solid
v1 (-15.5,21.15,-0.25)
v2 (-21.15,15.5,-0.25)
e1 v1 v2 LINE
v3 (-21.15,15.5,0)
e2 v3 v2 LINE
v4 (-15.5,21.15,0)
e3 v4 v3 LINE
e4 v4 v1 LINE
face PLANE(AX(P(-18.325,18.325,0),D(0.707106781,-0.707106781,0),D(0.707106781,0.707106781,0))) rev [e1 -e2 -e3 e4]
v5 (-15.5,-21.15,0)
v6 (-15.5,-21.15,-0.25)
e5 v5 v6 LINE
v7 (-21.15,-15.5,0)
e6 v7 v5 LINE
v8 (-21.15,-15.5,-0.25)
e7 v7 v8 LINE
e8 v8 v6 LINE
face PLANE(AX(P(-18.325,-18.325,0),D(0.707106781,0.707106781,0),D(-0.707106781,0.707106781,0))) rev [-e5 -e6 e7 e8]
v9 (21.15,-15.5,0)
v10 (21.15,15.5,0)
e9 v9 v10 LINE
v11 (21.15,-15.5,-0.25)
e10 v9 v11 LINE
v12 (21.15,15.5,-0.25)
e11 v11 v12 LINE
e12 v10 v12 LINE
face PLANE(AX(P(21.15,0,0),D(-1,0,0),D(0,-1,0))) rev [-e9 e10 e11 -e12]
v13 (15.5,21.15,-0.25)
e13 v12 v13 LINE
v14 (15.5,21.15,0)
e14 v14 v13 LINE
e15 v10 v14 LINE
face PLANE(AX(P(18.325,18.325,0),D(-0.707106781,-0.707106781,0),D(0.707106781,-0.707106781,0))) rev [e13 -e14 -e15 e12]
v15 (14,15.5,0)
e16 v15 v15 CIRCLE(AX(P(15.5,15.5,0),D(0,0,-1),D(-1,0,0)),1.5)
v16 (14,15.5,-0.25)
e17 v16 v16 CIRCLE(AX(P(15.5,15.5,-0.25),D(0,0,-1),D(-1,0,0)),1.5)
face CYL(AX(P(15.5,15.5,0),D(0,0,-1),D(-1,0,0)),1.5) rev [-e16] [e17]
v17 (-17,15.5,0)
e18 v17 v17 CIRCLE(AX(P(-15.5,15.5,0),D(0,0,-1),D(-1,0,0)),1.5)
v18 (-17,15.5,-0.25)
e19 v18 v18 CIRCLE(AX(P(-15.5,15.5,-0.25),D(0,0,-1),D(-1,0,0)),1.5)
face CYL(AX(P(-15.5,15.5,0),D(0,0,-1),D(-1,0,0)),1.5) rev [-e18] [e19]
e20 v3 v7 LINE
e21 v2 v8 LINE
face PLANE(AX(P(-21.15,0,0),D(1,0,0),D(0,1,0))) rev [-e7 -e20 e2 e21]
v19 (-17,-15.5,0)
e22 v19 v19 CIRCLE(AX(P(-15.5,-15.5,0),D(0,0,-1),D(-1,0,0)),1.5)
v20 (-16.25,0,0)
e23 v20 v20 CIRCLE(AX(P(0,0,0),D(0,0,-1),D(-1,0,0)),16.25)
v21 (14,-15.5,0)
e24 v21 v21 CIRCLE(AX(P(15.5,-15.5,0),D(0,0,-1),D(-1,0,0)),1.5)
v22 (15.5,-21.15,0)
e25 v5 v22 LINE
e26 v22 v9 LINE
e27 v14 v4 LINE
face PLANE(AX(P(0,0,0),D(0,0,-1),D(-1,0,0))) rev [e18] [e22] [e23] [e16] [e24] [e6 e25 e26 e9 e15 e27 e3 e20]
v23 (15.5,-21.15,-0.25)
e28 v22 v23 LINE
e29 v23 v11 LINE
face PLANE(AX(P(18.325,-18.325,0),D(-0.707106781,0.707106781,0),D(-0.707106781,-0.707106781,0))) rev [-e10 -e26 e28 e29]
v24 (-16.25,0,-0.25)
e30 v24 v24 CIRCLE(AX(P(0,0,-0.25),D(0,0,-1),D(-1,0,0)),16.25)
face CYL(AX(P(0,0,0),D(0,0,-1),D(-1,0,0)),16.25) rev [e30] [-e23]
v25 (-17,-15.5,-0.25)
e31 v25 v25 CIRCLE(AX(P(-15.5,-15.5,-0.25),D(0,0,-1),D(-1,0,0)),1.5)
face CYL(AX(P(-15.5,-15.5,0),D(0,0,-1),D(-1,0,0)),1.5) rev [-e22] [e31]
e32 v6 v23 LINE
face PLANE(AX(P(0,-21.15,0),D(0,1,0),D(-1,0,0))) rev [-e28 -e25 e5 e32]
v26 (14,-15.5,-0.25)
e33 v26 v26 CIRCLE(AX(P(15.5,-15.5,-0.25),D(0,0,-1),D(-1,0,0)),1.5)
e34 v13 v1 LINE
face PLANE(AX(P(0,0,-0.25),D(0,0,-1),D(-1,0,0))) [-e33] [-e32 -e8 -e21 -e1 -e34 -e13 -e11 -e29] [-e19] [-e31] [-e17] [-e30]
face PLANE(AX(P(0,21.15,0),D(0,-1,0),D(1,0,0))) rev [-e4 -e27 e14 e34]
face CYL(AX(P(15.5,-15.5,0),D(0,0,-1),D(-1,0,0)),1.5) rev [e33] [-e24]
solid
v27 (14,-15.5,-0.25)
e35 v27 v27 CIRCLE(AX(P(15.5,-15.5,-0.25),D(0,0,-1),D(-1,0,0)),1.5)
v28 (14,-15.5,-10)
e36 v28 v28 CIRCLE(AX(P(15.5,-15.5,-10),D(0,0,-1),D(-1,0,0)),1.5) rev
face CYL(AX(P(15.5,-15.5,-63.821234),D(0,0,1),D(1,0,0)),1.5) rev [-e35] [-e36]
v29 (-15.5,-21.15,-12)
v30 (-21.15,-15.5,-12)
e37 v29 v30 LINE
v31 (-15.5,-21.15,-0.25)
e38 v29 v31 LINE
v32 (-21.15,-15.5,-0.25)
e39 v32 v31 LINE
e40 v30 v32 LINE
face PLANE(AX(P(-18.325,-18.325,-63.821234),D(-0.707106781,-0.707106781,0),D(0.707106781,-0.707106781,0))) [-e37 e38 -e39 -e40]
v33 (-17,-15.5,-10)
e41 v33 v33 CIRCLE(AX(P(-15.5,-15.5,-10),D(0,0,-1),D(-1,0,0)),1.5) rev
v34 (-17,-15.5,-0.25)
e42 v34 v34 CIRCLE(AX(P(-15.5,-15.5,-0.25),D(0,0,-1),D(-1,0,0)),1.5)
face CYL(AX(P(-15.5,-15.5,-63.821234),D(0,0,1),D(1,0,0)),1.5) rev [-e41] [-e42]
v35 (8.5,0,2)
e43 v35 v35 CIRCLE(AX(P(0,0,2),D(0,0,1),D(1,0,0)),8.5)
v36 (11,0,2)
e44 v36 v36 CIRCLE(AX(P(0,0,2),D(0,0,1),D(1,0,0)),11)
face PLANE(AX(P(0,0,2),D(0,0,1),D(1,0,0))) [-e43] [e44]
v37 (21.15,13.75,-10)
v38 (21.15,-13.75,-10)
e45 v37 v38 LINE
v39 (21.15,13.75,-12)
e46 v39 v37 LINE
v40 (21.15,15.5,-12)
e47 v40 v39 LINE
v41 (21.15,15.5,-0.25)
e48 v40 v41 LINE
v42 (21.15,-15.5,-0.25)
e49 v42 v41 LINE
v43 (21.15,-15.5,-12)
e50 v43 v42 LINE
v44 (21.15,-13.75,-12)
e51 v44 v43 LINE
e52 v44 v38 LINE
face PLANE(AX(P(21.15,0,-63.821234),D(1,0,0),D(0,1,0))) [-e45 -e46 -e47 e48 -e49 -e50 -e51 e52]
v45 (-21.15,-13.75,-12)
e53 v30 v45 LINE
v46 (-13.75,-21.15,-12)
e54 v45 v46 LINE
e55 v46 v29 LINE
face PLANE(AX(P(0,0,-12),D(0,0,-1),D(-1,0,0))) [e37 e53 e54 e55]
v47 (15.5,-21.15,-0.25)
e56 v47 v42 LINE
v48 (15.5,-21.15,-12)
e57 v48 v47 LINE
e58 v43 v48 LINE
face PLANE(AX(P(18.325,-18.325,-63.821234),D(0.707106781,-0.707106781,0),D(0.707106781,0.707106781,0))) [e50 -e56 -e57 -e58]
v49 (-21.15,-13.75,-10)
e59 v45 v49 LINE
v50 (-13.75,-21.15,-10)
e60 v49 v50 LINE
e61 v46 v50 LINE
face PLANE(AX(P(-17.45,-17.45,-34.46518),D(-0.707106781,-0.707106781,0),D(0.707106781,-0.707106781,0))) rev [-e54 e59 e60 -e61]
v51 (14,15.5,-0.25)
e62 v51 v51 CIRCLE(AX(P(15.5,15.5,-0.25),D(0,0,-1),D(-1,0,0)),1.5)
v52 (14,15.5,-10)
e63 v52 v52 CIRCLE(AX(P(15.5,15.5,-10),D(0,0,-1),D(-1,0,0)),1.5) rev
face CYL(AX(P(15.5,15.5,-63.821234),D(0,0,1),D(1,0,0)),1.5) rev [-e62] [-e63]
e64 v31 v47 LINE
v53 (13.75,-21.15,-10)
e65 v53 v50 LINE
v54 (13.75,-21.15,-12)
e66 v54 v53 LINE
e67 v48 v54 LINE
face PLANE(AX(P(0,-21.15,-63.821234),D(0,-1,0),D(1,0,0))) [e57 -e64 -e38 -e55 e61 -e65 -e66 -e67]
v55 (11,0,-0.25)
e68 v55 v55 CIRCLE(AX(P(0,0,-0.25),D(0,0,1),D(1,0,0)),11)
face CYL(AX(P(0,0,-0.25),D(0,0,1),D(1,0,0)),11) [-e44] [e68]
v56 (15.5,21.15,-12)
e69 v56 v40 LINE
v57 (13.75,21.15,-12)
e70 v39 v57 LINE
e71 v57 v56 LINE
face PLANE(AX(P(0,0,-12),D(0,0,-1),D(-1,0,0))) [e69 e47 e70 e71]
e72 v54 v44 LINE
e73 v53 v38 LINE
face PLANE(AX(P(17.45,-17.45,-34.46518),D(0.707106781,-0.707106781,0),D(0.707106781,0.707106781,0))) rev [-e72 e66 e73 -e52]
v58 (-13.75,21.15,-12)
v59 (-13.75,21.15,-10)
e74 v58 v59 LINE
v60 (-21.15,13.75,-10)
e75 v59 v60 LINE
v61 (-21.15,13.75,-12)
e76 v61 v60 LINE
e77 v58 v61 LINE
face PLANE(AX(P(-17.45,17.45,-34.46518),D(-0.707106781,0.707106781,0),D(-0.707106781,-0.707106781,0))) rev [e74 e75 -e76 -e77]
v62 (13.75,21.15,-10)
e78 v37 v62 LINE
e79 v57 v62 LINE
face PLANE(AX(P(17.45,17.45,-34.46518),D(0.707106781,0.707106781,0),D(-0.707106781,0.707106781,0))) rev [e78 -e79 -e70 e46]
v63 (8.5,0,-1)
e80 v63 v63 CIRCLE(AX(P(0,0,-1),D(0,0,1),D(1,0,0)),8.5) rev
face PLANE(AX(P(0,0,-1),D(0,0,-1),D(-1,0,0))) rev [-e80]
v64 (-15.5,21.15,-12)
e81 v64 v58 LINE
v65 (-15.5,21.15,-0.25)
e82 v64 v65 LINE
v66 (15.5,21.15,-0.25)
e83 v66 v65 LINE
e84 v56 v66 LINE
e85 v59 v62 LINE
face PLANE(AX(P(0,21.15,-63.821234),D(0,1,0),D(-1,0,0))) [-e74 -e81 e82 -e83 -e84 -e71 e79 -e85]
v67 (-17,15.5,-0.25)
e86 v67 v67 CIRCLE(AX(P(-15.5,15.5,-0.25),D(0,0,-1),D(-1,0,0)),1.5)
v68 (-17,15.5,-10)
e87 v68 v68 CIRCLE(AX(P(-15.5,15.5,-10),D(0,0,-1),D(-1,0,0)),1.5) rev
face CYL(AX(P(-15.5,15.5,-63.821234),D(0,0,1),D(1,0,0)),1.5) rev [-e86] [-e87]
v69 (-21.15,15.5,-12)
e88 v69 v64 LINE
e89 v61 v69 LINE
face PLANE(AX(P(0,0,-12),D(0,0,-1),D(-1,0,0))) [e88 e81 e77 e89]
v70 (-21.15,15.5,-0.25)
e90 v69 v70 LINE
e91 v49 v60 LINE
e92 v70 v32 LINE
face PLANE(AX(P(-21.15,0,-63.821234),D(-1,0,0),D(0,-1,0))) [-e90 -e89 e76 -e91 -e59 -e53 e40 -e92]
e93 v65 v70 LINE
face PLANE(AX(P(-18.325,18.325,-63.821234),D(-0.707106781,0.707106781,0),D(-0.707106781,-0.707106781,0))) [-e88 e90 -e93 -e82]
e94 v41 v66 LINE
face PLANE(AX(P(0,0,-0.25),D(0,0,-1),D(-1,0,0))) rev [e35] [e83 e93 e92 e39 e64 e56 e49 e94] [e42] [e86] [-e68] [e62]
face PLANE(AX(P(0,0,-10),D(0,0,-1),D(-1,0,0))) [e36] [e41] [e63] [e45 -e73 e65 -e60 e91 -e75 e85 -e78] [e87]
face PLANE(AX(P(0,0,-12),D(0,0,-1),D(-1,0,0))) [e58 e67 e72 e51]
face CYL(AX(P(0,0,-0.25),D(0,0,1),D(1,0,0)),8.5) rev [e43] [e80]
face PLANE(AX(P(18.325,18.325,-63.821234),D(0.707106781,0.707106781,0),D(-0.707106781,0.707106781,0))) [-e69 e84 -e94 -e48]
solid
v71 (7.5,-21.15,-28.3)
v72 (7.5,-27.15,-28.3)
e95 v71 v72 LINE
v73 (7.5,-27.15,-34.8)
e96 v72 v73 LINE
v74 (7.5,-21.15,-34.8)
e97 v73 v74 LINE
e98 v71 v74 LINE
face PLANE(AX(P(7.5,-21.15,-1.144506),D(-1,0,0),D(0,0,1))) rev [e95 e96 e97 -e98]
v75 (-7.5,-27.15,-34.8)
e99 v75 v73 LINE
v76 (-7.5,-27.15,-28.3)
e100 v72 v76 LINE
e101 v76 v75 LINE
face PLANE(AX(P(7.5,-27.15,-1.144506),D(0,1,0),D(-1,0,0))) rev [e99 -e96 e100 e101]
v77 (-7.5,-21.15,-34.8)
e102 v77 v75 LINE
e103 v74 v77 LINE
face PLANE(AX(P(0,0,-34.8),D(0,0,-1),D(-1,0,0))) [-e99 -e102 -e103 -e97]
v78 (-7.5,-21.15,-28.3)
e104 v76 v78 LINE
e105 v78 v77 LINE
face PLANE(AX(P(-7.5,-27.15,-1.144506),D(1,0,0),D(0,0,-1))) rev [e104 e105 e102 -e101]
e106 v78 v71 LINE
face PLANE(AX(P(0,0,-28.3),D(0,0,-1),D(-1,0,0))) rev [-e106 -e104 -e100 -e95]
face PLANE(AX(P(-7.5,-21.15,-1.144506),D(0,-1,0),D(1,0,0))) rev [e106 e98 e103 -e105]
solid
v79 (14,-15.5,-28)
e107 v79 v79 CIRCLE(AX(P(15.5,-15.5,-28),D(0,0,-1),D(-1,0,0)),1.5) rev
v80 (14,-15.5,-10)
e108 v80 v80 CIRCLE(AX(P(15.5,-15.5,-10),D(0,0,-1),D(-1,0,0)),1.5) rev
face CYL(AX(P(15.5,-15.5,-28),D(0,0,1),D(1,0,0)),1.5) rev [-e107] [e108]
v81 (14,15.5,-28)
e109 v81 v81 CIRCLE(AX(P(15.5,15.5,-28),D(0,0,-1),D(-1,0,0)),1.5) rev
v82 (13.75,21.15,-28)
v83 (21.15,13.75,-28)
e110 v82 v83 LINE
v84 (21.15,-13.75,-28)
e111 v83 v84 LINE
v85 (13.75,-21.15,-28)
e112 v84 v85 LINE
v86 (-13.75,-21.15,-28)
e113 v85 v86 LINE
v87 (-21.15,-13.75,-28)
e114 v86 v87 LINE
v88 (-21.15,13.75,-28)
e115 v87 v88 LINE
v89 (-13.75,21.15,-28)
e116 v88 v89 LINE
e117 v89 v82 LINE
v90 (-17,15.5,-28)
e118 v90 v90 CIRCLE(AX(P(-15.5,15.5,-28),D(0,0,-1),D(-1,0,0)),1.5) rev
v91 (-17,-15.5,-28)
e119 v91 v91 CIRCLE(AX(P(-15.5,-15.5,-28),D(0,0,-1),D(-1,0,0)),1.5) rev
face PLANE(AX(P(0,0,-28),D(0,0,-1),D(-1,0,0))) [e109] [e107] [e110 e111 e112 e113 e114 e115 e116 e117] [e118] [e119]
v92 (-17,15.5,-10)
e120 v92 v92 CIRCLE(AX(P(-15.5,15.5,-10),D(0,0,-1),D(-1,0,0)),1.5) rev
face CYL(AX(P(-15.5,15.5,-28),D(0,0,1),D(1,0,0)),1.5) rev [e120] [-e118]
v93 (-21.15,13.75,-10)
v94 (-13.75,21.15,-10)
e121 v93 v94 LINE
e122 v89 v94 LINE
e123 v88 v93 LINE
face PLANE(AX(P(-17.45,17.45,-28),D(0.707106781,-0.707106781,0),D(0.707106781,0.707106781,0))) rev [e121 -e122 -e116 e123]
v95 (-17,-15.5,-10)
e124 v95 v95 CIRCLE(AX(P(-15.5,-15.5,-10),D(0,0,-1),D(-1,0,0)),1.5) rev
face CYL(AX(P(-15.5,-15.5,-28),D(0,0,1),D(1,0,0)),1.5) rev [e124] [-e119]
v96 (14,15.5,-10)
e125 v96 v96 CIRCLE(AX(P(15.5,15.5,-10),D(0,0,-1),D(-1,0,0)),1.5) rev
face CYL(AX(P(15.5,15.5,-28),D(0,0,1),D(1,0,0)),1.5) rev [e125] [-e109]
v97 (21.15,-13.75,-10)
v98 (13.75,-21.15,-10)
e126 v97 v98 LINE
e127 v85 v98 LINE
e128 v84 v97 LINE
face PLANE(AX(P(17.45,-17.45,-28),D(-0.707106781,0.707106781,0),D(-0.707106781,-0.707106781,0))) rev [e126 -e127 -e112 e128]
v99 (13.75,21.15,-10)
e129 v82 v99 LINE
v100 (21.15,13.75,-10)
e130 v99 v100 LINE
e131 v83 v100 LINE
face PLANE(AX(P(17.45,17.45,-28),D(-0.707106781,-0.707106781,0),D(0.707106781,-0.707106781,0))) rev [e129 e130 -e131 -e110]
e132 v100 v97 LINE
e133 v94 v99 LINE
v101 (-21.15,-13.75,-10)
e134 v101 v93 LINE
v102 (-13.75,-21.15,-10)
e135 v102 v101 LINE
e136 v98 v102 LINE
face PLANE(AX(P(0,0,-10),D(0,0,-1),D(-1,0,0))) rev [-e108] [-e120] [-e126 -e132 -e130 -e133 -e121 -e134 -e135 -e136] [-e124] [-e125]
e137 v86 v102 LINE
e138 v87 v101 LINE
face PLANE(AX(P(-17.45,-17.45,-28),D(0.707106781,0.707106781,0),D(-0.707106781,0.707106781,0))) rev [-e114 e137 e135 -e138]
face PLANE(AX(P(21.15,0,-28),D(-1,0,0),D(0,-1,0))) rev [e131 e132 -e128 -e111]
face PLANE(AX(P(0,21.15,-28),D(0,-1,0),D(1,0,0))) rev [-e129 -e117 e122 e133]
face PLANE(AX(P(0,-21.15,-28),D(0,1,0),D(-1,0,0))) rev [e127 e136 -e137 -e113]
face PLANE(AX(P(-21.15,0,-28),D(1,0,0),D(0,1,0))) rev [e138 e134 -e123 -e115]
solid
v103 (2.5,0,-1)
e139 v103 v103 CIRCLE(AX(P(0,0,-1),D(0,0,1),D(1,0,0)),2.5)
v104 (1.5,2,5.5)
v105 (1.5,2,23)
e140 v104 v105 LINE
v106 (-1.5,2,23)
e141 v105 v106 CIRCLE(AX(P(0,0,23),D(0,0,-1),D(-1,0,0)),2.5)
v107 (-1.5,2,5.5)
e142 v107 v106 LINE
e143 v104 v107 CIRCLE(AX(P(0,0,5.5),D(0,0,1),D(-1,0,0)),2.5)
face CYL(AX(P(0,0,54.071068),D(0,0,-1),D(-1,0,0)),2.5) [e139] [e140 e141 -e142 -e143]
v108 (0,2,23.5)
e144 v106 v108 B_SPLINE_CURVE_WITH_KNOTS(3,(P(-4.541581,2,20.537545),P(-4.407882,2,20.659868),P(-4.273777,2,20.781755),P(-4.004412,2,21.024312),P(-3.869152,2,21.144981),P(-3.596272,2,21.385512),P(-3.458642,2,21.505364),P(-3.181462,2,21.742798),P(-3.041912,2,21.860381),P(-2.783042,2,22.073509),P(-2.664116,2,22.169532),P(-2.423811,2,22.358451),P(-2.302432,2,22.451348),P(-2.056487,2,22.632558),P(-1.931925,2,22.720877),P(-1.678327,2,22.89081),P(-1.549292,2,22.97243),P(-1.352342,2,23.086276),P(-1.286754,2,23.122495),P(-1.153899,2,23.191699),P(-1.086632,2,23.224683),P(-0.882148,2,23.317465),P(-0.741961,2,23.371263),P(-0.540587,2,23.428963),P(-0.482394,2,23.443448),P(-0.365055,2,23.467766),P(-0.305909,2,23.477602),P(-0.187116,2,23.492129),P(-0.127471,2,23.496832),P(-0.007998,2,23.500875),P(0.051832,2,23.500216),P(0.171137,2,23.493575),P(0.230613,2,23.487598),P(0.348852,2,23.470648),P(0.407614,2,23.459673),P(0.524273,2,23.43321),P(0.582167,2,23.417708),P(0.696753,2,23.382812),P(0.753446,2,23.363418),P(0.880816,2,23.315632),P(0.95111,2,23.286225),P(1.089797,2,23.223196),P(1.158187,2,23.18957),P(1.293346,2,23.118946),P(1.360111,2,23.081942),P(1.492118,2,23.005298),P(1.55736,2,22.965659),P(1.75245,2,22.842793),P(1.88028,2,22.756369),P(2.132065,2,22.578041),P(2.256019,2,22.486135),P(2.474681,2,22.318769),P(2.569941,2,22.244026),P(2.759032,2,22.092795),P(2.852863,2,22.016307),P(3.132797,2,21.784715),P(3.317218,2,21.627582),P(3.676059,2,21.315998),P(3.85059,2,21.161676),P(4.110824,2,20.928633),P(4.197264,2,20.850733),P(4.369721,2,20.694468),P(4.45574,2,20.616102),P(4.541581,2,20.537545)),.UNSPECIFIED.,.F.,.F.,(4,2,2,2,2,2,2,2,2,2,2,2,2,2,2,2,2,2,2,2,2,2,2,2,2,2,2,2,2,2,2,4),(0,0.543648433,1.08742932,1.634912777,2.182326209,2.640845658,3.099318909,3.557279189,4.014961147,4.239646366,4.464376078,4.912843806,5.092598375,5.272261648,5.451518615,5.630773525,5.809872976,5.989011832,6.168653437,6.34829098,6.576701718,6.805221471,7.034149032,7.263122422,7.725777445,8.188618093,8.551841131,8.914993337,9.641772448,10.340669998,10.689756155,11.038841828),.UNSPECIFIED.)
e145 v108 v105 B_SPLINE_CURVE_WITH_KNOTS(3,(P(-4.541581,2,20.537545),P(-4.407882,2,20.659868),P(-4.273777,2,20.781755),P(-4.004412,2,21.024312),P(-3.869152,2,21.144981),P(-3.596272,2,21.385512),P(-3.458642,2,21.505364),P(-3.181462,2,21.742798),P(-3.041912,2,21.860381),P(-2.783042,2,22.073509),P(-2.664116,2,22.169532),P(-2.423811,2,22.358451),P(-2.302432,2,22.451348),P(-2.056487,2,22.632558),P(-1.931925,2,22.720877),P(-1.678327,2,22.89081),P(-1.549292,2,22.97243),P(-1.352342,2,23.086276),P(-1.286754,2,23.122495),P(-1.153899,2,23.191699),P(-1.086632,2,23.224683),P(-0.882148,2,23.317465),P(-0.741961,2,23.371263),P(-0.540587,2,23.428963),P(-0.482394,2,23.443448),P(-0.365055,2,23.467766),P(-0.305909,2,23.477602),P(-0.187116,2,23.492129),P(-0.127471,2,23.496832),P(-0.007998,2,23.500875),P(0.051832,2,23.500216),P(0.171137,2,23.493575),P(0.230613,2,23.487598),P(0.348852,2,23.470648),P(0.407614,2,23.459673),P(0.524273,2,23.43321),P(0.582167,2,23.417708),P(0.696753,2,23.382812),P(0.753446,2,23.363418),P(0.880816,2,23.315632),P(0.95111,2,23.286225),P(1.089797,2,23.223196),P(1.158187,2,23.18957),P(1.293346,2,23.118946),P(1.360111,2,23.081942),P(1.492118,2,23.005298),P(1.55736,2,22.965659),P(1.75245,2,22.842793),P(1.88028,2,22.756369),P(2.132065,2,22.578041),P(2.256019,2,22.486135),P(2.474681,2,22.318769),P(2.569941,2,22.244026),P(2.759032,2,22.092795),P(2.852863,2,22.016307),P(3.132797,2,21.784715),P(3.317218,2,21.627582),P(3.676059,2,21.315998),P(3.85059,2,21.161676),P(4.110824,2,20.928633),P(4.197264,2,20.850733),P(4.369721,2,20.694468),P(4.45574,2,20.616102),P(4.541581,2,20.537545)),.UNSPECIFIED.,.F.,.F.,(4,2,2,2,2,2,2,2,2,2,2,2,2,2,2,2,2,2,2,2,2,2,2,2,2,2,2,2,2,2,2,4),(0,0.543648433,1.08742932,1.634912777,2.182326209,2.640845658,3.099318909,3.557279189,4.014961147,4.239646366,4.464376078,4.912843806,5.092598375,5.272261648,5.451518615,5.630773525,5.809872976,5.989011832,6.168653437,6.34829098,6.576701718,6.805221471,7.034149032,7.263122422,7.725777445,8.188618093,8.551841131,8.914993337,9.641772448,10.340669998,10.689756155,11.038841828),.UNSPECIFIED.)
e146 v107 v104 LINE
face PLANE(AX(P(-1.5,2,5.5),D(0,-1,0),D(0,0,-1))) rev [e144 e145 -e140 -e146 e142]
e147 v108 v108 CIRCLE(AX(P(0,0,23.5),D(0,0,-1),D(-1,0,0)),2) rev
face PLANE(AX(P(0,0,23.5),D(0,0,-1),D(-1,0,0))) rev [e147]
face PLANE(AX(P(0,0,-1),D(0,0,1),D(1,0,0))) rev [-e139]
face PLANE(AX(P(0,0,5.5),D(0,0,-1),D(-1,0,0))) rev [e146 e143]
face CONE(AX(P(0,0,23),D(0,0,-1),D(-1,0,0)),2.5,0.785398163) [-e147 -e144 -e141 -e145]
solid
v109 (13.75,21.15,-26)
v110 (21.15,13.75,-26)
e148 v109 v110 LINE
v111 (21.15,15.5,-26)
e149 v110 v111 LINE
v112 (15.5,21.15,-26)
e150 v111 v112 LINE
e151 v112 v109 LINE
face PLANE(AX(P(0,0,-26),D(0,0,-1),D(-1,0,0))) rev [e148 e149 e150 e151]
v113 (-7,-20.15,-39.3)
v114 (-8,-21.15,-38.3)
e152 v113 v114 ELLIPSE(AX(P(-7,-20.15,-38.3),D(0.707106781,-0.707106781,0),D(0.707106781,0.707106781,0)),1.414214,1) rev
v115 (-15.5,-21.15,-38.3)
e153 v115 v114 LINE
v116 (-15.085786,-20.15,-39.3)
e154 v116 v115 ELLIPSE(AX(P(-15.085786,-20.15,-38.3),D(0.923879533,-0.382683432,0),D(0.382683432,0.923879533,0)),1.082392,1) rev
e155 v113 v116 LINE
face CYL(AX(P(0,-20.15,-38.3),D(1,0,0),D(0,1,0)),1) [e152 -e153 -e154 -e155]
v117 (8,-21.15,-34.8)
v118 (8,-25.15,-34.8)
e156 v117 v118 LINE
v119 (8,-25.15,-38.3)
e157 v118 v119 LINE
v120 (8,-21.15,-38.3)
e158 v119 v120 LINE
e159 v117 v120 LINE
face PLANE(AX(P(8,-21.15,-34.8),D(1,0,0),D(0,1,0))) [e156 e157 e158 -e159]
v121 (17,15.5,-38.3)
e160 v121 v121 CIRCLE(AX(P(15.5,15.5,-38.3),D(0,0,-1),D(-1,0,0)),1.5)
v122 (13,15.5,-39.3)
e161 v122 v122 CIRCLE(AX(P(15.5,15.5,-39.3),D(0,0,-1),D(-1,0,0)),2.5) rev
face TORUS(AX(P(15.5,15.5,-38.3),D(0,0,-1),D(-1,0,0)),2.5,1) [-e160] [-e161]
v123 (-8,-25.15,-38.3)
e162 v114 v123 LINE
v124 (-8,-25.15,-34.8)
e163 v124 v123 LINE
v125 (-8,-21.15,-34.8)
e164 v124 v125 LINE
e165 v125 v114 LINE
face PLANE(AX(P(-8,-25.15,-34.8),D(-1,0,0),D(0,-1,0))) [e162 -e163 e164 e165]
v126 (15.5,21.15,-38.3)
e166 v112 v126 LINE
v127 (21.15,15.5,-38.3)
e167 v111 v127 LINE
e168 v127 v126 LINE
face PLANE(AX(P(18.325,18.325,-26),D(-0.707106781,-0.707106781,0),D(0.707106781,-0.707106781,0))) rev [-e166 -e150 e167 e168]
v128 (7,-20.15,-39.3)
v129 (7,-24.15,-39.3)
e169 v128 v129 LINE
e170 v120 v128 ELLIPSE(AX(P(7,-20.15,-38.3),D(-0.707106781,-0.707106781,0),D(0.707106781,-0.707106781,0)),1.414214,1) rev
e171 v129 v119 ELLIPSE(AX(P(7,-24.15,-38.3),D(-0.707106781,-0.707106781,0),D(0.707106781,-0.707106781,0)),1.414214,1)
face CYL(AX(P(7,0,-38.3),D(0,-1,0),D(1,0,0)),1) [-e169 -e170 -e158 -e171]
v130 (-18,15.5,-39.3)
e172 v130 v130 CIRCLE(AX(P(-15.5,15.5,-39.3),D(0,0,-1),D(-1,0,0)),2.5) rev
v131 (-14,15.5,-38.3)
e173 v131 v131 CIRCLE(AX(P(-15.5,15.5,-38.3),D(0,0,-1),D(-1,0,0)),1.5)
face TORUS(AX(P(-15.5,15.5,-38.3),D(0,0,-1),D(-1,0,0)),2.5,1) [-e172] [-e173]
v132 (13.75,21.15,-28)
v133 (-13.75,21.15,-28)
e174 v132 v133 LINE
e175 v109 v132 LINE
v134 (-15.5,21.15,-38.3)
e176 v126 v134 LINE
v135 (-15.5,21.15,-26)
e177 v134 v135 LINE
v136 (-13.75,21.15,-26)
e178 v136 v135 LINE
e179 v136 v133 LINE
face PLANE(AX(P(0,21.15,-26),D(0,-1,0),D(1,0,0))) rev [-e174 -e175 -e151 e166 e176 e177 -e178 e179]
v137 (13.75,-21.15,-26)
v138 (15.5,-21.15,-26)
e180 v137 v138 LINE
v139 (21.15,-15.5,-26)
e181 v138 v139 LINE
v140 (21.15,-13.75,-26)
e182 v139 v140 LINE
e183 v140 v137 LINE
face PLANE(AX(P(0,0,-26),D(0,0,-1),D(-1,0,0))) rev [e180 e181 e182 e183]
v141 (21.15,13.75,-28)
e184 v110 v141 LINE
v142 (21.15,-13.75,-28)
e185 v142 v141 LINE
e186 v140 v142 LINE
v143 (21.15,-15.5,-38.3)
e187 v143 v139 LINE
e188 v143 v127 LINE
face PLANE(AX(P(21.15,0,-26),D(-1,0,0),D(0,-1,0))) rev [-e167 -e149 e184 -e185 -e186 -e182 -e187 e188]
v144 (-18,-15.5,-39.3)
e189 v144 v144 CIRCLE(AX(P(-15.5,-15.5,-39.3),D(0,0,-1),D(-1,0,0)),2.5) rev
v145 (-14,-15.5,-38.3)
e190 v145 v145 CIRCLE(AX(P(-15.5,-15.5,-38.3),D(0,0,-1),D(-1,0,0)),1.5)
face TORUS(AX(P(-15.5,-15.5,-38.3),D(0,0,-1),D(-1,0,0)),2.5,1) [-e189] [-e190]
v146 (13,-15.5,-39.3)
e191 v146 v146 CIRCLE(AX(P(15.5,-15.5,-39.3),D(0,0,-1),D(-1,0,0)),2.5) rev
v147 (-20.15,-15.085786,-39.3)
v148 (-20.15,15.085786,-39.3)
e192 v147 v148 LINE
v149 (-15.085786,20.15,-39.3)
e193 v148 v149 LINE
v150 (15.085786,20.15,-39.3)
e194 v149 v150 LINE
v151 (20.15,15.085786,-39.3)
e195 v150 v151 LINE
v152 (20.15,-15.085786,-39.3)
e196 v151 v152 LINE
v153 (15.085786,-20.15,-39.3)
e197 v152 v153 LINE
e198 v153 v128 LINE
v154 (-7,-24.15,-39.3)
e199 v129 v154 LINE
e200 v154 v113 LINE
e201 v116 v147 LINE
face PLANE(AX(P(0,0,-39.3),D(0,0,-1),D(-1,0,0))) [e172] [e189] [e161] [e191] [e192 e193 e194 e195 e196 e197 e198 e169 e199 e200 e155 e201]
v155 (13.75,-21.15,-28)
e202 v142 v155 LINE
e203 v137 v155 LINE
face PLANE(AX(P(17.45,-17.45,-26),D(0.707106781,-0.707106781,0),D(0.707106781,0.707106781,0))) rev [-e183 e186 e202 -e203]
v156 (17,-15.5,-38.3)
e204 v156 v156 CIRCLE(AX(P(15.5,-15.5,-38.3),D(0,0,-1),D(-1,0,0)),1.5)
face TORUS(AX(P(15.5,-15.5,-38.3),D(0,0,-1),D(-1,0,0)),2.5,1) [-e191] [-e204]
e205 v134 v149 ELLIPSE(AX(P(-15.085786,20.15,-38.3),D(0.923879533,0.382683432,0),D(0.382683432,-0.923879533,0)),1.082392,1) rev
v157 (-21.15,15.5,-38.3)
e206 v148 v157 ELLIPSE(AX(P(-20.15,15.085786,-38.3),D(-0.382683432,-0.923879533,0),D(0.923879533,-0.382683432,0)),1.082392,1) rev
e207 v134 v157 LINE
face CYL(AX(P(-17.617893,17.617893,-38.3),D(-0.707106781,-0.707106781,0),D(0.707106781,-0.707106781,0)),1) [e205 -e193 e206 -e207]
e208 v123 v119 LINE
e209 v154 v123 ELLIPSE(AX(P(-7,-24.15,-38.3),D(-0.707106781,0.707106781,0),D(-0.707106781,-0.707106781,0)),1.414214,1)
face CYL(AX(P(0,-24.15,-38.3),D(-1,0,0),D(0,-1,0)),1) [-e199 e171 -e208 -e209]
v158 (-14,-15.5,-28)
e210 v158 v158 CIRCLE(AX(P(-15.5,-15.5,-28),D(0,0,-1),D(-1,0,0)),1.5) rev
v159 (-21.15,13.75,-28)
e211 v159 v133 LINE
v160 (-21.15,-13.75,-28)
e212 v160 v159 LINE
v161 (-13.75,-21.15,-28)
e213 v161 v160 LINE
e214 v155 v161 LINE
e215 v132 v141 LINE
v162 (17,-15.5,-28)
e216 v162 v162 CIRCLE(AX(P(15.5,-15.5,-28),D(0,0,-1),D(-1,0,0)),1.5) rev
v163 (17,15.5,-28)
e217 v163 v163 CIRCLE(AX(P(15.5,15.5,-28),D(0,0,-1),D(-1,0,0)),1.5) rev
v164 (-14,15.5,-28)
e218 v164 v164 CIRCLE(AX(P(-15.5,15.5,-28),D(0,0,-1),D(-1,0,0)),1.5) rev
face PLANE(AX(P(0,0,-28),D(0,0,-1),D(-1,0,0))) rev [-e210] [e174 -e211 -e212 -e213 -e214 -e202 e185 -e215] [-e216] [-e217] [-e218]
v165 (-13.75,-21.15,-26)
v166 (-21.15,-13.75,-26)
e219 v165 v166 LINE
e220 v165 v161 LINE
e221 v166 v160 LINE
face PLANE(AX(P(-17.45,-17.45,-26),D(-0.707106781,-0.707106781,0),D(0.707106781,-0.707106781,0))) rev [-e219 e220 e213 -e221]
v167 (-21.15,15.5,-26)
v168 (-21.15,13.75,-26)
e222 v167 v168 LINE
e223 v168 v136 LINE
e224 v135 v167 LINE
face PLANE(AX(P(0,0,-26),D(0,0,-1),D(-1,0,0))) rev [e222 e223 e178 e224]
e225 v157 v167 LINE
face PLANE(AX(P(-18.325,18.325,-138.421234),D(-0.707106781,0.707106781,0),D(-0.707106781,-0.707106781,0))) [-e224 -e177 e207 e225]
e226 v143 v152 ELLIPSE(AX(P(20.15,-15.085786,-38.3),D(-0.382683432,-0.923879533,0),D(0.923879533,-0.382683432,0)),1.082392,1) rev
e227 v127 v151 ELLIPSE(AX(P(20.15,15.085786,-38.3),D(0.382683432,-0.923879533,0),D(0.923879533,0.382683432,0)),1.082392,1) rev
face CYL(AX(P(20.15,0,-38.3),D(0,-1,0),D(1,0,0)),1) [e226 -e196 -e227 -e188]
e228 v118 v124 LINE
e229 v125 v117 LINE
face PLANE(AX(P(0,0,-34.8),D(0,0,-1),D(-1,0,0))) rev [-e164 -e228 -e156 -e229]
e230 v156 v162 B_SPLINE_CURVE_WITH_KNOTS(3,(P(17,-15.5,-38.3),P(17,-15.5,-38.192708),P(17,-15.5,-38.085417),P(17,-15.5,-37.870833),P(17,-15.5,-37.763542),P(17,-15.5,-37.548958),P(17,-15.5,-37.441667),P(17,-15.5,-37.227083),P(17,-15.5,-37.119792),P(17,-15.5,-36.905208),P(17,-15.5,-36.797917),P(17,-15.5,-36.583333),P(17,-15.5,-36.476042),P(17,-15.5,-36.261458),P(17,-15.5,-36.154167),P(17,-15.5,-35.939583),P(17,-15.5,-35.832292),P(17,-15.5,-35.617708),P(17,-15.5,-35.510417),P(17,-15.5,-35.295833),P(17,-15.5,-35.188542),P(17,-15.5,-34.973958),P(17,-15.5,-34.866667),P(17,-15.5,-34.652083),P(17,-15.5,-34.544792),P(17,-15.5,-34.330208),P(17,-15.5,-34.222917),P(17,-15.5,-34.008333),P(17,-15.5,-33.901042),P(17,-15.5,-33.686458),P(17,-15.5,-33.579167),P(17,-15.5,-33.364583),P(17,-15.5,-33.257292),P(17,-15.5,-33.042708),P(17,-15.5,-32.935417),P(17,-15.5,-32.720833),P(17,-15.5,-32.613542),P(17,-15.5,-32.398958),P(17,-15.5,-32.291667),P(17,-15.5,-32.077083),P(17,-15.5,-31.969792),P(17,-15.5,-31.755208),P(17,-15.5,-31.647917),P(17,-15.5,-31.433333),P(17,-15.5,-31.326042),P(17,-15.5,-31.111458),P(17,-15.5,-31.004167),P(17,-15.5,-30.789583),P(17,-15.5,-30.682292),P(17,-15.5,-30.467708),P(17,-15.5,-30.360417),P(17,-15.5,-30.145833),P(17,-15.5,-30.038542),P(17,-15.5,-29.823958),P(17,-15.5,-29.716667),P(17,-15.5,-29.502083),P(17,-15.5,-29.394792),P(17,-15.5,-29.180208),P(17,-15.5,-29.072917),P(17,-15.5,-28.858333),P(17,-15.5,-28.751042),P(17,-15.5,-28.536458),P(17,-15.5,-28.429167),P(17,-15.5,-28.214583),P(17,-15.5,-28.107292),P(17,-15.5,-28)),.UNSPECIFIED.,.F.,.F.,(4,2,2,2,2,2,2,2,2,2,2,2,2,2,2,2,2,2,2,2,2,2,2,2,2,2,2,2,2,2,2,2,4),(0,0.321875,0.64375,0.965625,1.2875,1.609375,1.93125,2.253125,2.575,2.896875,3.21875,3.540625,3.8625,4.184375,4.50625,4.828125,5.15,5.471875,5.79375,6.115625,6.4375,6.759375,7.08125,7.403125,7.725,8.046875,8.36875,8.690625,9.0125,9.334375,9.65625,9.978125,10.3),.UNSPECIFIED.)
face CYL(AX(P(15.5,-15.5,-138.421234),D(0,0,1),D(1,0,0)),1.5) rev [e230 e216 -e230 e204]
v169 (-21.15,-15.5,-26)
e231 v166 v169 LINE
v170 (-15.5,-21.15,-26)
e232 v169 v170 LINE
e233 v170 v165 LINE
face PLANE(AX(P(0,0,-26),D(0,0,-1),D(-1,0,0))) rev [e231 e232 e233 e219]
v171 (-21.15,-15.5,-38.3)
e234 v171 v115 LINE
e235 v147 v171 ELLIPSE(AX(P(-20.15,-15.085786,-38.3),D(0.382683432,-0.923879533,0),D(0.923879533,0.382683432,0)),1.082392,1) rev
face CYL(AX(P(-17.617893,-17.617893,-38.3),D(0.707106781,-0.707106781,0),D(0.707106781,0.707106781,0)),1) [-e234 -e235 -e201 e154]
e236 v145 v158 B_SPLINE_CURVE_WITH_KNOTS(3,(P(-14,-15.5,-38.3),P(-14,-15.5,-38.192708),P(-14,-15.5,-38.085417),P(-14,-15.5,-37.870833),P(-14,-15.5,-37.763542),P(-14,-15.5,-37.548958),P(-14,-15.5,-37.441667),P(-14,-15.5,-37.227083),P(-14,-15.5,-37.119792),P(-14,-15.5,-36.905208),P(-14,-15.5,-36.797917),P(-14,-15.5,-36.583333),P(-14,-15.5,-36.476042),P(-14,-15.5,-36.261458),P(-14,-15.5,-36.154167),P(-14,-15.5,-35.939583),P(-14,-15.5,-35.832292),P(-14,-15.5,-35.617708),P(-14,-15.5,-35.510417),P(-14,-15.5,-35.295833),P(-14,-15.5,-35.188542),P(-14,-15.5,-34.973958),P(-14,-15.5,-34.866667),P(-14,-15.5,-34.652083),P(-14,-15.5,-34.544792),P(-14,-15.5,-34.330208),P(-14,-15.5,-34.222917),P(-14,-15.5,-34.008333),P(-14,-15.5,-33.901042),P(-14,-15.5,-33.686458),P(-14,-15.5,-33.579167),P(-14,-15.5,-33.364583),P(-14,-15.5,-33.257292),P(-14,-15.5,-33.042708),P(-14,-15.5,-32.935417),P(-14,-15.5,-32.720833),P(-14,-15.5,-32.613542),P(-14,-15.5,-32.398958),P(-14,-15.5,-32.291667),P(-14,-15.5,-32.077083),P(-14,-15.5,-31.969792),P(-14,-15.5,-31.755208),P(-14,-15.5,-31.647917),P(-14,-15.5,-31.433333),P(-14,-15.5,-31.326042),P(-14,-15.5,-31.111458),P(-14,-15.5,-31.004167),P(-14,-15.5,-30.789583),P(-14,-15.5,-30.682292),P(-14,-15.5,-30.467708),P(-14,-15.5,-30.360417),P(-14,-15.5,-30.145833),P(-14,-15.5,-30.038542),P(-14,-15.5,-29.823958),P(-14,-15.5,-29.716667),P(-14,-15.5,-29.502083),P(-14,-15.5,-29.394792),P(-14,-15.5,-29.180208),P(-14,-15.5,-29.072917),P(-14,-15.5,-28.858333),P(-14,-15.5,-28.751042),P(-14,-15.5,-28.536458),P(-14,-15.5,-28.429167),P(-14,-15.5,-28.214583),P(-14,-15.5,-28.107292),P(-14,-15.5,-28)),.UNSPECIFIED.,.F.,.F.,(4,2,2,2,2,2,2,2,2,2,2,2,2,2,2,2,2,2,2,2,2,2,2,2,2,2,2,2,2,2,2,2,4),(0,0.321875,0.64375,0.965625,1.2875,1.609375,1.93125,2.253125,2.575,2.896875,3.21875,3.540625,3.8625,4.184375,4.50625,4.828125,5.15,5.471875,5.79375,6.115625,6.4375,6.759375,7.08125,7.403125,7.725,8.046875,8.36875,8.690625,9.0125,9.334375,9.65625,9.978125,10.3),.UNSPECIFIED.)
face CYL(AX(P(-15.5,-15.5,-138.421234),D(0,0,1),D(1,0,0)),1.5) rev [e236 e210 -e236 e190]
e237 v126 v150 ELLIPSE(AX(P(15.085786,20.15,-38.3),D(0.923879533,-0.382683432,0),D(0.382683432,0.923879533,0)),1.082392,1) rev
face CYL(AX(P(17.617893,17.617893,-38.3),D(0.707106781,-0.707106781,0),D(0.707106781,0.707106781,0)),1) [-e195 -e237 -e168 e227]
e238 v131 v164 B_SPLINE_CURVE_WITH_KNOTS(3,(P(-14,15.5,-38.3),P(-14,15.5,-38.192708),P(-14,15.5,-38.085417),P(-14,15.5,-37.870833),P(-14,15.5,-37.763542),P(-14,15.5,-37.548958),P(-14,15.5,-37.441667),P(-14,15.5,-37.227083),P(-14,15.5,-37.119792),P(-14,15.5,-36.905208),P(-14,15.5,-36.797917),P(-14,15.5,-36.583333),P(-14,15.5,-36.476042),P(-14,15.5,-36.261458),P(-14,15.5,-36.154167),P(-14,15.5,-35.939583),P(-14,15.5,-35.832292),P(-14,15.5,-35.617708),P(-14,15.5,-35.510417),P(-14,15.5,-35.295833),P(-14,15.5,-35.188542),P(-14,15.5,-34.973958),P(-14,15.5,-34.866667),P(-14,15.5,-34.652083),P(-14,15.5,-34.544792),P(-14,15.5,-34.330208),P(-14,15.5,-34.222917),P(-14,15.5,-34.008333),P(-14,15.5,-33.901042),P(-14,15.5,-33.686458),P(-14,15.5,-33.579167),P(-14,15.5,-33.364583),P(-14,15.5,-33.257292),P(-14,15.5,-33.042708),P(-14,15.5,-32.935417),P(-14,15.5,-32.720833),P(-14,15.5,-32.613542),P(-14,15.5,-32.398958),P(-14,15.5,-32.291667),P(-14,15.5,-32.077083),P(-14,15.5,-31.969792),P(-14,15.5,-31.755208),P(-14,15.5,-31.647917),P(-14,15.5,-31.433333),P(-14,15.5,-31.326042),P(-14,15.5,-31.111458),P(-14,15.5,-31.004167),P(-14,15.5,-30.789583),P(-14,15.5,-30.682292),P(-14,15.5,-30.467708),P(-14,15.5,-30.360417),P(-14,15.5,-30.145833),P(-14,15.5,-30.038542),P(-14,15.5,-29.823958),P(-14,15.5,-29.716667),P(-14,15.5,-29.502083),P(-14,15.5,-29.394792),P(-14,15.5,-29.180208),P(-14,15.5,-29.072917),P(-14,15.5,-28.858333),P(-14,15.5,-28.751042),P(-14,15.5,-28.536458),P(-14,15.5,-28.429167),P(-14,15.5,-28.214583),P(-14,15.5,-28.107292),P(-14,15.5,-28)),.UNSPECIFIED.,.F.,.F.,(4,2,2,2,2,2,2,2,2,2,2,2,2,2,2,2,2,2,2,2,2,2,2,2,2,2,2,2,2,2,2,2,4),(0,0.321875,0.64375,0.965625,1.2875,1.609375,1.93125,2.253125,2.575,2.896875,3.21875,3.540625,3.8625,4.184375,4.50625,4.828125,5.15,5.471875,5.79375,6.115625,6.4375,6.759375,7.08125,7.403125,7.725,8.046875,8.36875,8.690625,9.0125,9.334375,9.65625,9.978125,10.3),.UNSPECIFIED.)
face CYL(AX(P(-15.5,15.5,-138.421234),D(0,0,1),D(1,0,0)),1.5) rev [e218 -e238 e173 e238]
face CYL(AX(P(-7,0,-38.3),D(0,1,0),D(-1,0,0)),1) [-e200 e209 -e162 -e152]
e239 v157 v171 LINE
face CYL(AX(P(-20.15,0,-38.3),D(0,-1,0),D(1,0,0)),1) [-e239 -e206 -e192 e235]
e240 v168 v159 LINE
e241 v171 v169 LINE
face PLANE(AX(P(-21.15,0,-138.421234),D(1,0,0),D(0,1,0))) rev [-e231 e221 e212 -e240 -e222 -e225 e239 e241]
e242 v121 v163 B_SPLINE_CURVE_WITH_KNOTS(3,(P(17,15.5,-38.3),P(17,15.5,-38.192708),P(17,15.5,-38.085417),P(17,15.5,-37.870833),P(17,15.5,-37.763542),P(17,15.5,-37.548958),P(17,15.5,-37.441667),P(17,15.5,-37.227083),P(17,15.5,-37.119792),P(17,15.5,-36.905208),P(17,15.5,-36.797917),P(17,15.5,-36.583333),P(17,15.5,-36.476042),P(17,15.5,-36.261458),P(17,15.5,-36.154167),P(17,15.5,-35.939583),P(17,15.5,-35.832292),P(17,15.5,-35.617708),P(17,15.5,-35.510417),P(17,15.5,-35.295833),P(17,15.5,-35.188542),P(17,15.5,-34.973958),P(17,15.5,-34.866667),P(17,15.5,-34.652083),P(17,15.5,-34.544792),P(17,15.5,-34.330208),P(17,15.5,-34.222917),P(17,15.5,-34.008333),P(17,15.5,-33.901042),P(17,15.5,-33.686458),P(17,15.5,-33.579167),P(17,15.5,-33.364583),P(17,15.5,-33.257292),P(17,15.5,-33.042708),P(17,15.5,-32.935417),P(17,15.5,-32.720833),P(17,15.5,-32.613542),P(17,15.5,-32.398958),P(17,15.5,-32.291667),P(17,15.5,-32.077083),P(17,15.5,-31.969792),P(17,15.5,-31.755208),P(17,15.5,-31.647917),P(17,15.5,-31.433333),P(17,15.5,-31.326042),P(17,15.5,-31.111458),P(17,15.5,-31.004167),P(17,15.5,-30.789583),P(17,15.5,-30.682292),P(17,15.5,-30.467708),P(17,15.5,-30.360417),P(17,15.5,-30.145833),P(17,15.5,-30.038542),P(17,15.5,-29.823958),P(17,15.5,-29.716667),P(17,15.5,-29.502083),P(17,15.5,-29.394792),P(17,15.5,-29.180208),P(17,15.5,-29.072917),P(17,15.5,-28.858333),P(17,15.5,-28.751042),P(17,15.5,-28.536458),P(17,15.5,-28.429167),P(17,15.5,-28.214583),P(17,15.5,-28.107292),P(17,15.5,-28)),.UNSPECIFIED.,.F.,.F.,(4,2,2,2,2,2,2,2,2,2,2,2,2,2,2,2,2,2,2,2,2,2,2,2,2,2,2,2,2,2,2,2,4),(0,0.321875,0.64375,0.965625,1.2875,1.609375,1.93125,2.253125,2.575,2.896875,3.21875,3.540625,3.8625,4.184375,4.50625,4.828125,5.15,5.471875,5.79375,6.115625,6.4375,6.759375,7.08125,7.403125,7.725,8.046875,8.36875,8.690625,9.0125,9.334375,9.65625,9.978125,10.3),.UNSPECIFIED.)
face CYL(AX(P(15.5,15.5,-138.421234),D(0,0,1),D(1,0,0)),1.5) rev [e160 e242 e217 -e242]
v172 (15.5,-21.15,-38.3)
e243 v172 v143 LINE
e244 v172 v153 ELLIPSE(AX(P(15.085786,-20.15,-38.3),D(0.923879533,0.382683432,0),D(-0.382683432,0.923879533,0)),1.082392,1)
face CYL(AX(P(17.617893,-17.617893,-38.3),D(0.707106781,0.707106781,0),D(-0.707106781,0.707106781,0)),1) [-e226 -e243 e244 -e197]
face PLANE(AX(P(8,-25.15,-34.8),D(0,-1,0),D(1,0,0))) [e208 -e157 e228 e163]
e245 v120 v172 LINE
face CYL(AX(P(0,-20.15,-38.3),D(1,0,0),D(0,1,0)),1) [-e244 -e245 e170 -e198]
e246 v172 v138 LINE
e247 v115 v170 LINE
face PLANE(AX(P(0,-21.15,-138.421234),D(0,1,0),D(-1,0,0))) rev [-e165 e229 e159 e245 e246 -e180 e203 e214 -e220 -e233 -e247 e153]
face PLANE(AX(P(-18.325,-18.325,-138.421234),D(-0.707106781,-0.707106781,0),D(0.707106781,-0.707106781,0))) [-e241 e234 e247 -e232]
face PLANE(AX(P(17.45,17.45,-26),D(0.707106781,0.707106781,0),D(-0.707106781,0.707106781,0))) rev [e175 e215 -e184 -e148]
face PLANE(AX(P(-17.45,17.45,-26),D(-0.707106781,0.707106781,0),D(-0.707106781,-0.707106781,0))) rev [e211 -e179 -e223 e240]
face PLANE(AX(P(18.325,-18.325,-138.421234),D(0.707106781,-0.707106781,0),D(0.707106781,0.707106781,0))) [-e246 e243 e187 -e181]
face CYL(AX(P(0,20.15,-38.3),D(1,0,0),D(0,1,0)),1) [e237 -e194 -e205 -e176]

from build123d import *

# Parameters (mm, degrees)
BOSS_EXTRUDE1_DEPTH      = 2
BOSS_EXTRUDE1_DEPTH_BACK = 0.25
SKETCH1_R                = 11
SKETCH1_R_2              = 8.5
SKETCH2_R                = 1.5
SKETCH2_R_2              = 16.25
BOSS_EXTRUDE3_DEPTH      = 0.25
SKETCH2_7_R              = 1.5
SKETCH2_7_R_2            = 16.25
SKETCH2_7_R_3            = 11
SKETCH2_7_R_4            = 8.5
BOSS_EXTRUDE5_DEPTH      = 0.75
SKETCH3_R                = 1.5
BOSS_EXTRUDE6_DEPTH      = 9
BOSS_EXTRUDE7_DEPTH      = 11
BOSS_EXTRUDE9_OUTLINE_R  = 1.5
BOSS_EXTRUDE9_DEPTH      = 18
BOSS_EXTRUDE10_DEPTH     = 2
BOSS_EXTRUDE10_2_DEPTH   = 2
BOSS_EXTRUDE10_3_DEPTH   = 2
BOSS_EXTRUDE10_4_DEPTH   = 2
SKETCH7_3_R              = 1.5
BOSS_EXTRUDE11_DEPTH     = 11.3
SKETCH8_R                = 2.5
BOSS_EXTRUDE13_DEPTH     = 24.5
CHAMFER1_SIZE            = 0.5
CUT_EXTRUDE1_DEPTH       = 18
SKETCH10_W               = 16
SKETCH10_H               = 4
BOSS_EXTRUDE14_DEPTH     = 4.5
FILLET1_R                = 1
SKETCH11_W               = 15
SKETCH11_H               = 6
BOSS_EXTRUDE15_DEPTH     = 6.5


# Read off the part's stored shape, not the designer's step: Boss-Extrude9
with BuildPart() as part:
    # Sketch1 → Boss-Extrude1 (new, two sides: drawn at the far end of the back side and taken through both)
    with BuildSketch(Plane.XY.offset(-BOSS_EXTRUDE1_DEPTH_BACK)):
        Circle(SKETCH1_R)
        Circle(SKETCH1_R_2, mode=Mode.SUBTRACT)
    extrude(amount=BOSS_EXTRUDE1_DEPTH + BOSS_EXTRUDE1_DEPTH_BACK)

    # Sketch2<7> → Boss-Extrude5 (add)
    # profile 1 of 3: a face of its own
    with BuildSketch(Plane(origin=(0, 0, -0.25), x_dir=(-1, 0, 0), z_dir=(0, 0, -1))):
        Polygon((-21.15, -15.5), (-21.15, 0), (-21.15, 15.5), (-15.5, 21.15), (0, 21.15), (15.5, 21.15), (21.15, 15.5), (21.15, 0), (21.15, -15.5), (15.5, -21.15), (0, -21.15), (-15.5, -21.15), align=None)
        with Locations((-15.5, -15.5)):
            Circle(SKETCH2_7_R, mode=Mode.SUBTRACT)
        with Locations((15.5, -15.5)):
            Circle(SKETCH2_7_R, mode=Mode.SUBTRACT)
        with Locations((15.5, 15.5)):
            Circle(SKETCH2_7_R, mode=Mode.SUBTRACT)
        with Locations((-15.5, 15.5)):
            Circle(SKETCH2_7_R, mode=Mode.SUBTRACT)
        Circle(SKETCH2_7_R_2, mode=Mode.SUBTRACT)
    # profile 2 of 3: a face of its own
    with BuildSketch(Plane(origin=(0, 0, -0.25), x_dir=(-1, 0, 0), z_dir=(0, 0, -1))):
        Circle(SKETCH2_7_R_2)
        with Locations(Location((0, 0, 0), (0, 0, 180))):
            Circle(SKETCH2_7_R_3, mode=Mode.SUBTRACT)
    # profile 3 of 3: a face of its own
    with BuildSketch(Plane(origin=(0, 0, -0.25), x_dir=(-1, 0, 0), z_dir=(0, 0, -1))):
        with Locations(Location((0, 0, 0), (0, 0, 180))):
            Circle(SKETCH2_7_R_3)
        with Locations(Location((0, 0, 0), (0, 0, 180))):
            Circle(SKETCH2_7_R_4, mode=Mode.SUBTRACT)
    extrude(amount=BOSS_EXTRUDE5_DEPTH)

    # Sketch3 → Boss-Extrude6 (add)
    with BuildSketch(Plane(origin=(0, 0, -1), x_dir=(-1, 0, 0), z_dir=(0, 0, -1))):
        Polygon((-21.15, 13.75), (-21.15, -13.75), (-13.75, -21.15), (13.75, -21.15), (21.15, -13.75), (21.15, 13.75), (13.75, 21.15), (-13.75, 21.15), align=None)
        with Locations((-15.5, -15.5)):
            Circle(SKETCH3_R, mode=Mode.SUBTRACT)
        with Locations((15.5, -15.5)):
            Circle(SKETCH3_R, mode=Mode.SUBTRACT)
        with Locations((-15.5, 15.5)):
            Circle(SKETCH3_R, mode=Mode.SUBTRACT)
        with Locations((15.5, 15.5)):
            Circle(SKETCH3_R, mode=Mode.SUBTRACT)
    extrude(amount=BOSS_EXTRUDE6_DEPTH)

    # Sketch3<3> → Boss-Extrude7 (add)
    with BuildSketch(Plane(origin=(0, 0, -1), x_dir=(-1, 0, 0), z_dir=(0, 0, -1))):
        Polygon((-21.15, 15.5), (-21.15, 13.75), (-13.75, 21.15), (-15.5, 21.15), align=None)
        Polygon((15.5, 21.15), (13.75, 21.15), (21.15, 13.75), (21.15, 15.5), align=None)
        Polygon((21.15, -13.75), (13.75, -21.15), (15.5, -21.15), (21.15, -15.5), align=None)
        Polygon((-13.75, -21.15), (-21.15, -13.75), (-21.15, -15.5), (-15.5, -21.15), align=None)
    extrude(amount=BOSS_EXTRUDE7_DEPTH)


with BuildPart() as body_2:
    # Sketch2 → Boss-Extrude3 (new body)
    with BuildSketch(Plane(origin=(0, 0, -0.25), x_dir=(-1, 0, 0), z_dir=(0, 0, -1))):
        Polygon((-21.15, -15.5), (-21.15, 0), (-21.15, 15.5), (-15.5, 21.15), (0, 21.15), (15.5, 21.15), (21.15, 15.5), (21.15, 0), (21.15, -15.5), (15.5, -21.15), (0, -21.15), (-15.5, -21.15), align=None)
        with Locations((-15.5, -15.5)):
            Circle(SKETCH2_R, mode=Mode.SUBTRACT)
        with Locations((15.5, -15.5)):
            Circle(SKETCH2_R, mode=Mode.SUBTRACT)
        with Locations((15.5, 15.5)):
            Circle(SKETCH2_R, mode=Mode.SUBTRACT)
        with Locations((-15.5, 15.5)):
            Circle(SKETCH2_R, mode=Mode.SUBTRACT)
        Circle(SKETCH2_R_2, mode=Mode.SUBTRACT)
    extrude(amount=-BOSS_EXTRUDE3_DEPTH)


with BuildPart() as body_3:
    # Boss-Extrude9 outline → Boss-Extrude9 (new body)
    with BuildSketch(Plane(origin=(0, 0, -10), x_dir=(-1, 0, 0), z_dir=(0, 0, -1))):
        Polygon((-21.15, 13.75), (-21.15, -13.75), (-13.75, -21.15), (13.75, -21.15), (21.15, -13.75), (21.15, 13.75), (13.75, 21.15), (-13.75, 21.15), align=None)
        with Locations((-15.5, -15.5)):
            Circle(BOSS_EXTRUDE9_OUTLINE_R, mode=Mode.SUBTRACT)
        with Locations((15.5, -15.5)):
            Circle(BOSS_EXTRUDE9_OUTLINE_R, mode=Mode.SUBTRACT)
        with Locations((-15.5, 15.5)):
            Circle(BOSS_EXTRUDE9_OUTLINE_R, mode=Mode.SUBTRACT)
        with Locations((15.5, 15.5)):
            Circle(BOSS_EXTRUDE9_OUTLINE_R, mode=Mode.SUBTRACT)
    extrude(amount=BOSS_EXTRUDE9_DEPTH)


with BuildPart() as body_4:
    # Sketch7 → Boss-Extrude10 (new body)
    with BuildSketch(Plane(origin=(0, 0, -28), x_dir=(-1, 0, 0), z_dir=(0, 0, -1))):
        Polygon((-15.5, 21.15), (-13.75, 21.15), (-21.15, 13.75), (-21.15, 15.5), align=None)
    extrude(amount=-BOSS_EXTRUDE10_DEPTH)



with BuildPart() as body_5:
    # Sketch7 → Boss-Extrude10 2 (new body)
    with BuildSketch(Plane(origin=(0, 0, -28), x_dir=(-1, 0, 0), z_dir=(0, 0, -1))):
        Polygon((21.15, 15.5), (21.15, 13.75), (13.75, 21.15), (15.5, 21.15), align=None)
    extrude(amount=-BOSS_EXTRUDE10_2_DEPTH)


with BuildPart() as body_6:
    # Sketch7 → Boss-Extrude10 3 (new body)
    with BuildSketch(Plane(origin=(0, 0, -28), x_dir=(-1, 0, 0), z_dir=(0, 0, -1))):
        Polygon((15.5, -21.15), (13.75, -21.15), (21.15, -13.75), (21.15, -15.5), align=None)
    extrude(amount=-BOSS_EXTRUDE10_3_DEPTH)


with BuildPart() as body_7:
    # Sketch7 → Boss-Extrude10 4 (new body)
    with BuildSketch(Plane(origin=(0, 0, -28), x_dir=(-1, 0, 0), z_dir=(0, 0, -1))):
        Polygon((-21.15, -15.5), (-21.15, -13.75), (-13.75, -21.15), (-15.5, -21.15), align=None)
    extrude(amount=-BOSS_EXTRUDE10_4_DEPTH)


with BuildPart() as body_4_1:
    add(body_4.part)

    add(body_7.part)  # Boss-Extrude11 merges body 7

    add(body_6.part)  # Boss-Extrude11 merges body 6

    add(body_5.part)  # Boss-Extrude11 merges body 5
    # Sketch7<3> → Boss-Extrude11 (add)
    with BuildSketch(Plane(origin=(0, 0, -28), x_dir=(-1, 0, 0), z_dir=(0, 0, -1))):
        Polygon((-15.5, 21.15), (-21.15, 15.5), (-21.15, -15.5), (-15.5, -21.15), (15.5, -21.15), (21.15, -15.5), (21.15, 15.5), (15.5, 21.15), align=None)
        with Locations((-15.5, -15.5)):
            Circle(SKETCH7_3_R, mode=Mode.SUBTRACT)
        with Locations((15.5, -15.5)):
            Circle(SKETCH7_3_R, mode=Mode.SUBTRACT)
        with Locations((-15.5, 15.5)):
            Circle(SKETCH7_3_R, mode=Mode.SUBTRACT)
        with Locations((15.5, 15.5)):
            Circle(SKETCH7_3_R, mode=Mode.SUBTRACT)
    extrude(amount=BOSS_EXTRUDE11_DEPTH)

    # Sketch10 → Boss-Extrude14 (add)
    with BuildSketch(Plane(origin=(0, 0, -39.3), x_dir=(-1, 0, 0), z_dir=(0, 0, -1))):
        with Locations((0, -23.15)):
            Rectangle(SKETCH10_W, SKETCH10_H)
    extrude(amount=-BOSS_EXTRUDE14_DEPTH)

    # Fillet1
    fillet1_edges = [body_4_1.edges().sort_by_distance(p)[0] for p in [
        (0, 21.15, -39.3),
        (18.325, 18.325, -39.3),
        (21.15, 0, -39.3),
        (18.325, -18.325, -39.3),
        (-18.325, -18.325, -39.3),
        (-18.325, 18.325, -39.3),
        (-14, -15.5, -39.3),
        (-14, 15.5, -39.3),
        (11.75, -21.15, -39.3),
        (-21.15, 0, -39.3),
        (17, 15.5, -39.3),
        (17, -15.5, -39.3),
        (-11.75, -21.15, -39.3),
        (-8, -23.15, -39.3),
        (8, -23.15, -39.3),
        (0, -25.15, -39.3),
    ]]
    fillet(fillet1_edges, radius=FILLET1_R)


with BuildPart() as body_5_2:
    # Sketch8 → Boss-Extrude13 (new body)
    with BuildSketch(Plane.XY.offset(-1)):
        with Locations(Location((0, 0, 0), (0, 0, 180))):
            Circle(SKETCH8_R)
    extrude(amount=BOSS_EXTRUDE13_DEPTH)

    # Chamfer1
    chamfer1_edges = [body_5_2.edges().sort_by_distance(p)[0] for p in [
        (2.5, 0, 23.5),
    ]]
    chamfer(chamfer1_edges, length=CHAMFER1_SIZE)

    # Sketch9 → Cut-Extrude1 (cut)
    with BuildSketch(Plane.XY.offset(23.5)):
        with BuildLine():
            Line((-1.5, 2), (1.5, 2))
            ThreePointArc((1.5, 2), (0, 2.5), (-1.5, 2))
        make_face()
    extrude(amount=-CUT_EXTRUDE1_DEPTH, mode=Mode.SUBTRACT)


with BuildPart() as body_6_2:
    # Sketch11 → Boss-Extrude15 (new body)
    with BuildSketch(Plane.XY.offset(-34.8)):
        with Locations((0, -24.15)):
            Rectangle(SKETCH11_W, SKETCH11_H)
    extrude(amount=BOSS_EXTRUDE15_DEPTH)


solid = Compound([part.part, body_2.part, body_3.part, body_4_1.part, body_5_2.part, body_6_2.part])
